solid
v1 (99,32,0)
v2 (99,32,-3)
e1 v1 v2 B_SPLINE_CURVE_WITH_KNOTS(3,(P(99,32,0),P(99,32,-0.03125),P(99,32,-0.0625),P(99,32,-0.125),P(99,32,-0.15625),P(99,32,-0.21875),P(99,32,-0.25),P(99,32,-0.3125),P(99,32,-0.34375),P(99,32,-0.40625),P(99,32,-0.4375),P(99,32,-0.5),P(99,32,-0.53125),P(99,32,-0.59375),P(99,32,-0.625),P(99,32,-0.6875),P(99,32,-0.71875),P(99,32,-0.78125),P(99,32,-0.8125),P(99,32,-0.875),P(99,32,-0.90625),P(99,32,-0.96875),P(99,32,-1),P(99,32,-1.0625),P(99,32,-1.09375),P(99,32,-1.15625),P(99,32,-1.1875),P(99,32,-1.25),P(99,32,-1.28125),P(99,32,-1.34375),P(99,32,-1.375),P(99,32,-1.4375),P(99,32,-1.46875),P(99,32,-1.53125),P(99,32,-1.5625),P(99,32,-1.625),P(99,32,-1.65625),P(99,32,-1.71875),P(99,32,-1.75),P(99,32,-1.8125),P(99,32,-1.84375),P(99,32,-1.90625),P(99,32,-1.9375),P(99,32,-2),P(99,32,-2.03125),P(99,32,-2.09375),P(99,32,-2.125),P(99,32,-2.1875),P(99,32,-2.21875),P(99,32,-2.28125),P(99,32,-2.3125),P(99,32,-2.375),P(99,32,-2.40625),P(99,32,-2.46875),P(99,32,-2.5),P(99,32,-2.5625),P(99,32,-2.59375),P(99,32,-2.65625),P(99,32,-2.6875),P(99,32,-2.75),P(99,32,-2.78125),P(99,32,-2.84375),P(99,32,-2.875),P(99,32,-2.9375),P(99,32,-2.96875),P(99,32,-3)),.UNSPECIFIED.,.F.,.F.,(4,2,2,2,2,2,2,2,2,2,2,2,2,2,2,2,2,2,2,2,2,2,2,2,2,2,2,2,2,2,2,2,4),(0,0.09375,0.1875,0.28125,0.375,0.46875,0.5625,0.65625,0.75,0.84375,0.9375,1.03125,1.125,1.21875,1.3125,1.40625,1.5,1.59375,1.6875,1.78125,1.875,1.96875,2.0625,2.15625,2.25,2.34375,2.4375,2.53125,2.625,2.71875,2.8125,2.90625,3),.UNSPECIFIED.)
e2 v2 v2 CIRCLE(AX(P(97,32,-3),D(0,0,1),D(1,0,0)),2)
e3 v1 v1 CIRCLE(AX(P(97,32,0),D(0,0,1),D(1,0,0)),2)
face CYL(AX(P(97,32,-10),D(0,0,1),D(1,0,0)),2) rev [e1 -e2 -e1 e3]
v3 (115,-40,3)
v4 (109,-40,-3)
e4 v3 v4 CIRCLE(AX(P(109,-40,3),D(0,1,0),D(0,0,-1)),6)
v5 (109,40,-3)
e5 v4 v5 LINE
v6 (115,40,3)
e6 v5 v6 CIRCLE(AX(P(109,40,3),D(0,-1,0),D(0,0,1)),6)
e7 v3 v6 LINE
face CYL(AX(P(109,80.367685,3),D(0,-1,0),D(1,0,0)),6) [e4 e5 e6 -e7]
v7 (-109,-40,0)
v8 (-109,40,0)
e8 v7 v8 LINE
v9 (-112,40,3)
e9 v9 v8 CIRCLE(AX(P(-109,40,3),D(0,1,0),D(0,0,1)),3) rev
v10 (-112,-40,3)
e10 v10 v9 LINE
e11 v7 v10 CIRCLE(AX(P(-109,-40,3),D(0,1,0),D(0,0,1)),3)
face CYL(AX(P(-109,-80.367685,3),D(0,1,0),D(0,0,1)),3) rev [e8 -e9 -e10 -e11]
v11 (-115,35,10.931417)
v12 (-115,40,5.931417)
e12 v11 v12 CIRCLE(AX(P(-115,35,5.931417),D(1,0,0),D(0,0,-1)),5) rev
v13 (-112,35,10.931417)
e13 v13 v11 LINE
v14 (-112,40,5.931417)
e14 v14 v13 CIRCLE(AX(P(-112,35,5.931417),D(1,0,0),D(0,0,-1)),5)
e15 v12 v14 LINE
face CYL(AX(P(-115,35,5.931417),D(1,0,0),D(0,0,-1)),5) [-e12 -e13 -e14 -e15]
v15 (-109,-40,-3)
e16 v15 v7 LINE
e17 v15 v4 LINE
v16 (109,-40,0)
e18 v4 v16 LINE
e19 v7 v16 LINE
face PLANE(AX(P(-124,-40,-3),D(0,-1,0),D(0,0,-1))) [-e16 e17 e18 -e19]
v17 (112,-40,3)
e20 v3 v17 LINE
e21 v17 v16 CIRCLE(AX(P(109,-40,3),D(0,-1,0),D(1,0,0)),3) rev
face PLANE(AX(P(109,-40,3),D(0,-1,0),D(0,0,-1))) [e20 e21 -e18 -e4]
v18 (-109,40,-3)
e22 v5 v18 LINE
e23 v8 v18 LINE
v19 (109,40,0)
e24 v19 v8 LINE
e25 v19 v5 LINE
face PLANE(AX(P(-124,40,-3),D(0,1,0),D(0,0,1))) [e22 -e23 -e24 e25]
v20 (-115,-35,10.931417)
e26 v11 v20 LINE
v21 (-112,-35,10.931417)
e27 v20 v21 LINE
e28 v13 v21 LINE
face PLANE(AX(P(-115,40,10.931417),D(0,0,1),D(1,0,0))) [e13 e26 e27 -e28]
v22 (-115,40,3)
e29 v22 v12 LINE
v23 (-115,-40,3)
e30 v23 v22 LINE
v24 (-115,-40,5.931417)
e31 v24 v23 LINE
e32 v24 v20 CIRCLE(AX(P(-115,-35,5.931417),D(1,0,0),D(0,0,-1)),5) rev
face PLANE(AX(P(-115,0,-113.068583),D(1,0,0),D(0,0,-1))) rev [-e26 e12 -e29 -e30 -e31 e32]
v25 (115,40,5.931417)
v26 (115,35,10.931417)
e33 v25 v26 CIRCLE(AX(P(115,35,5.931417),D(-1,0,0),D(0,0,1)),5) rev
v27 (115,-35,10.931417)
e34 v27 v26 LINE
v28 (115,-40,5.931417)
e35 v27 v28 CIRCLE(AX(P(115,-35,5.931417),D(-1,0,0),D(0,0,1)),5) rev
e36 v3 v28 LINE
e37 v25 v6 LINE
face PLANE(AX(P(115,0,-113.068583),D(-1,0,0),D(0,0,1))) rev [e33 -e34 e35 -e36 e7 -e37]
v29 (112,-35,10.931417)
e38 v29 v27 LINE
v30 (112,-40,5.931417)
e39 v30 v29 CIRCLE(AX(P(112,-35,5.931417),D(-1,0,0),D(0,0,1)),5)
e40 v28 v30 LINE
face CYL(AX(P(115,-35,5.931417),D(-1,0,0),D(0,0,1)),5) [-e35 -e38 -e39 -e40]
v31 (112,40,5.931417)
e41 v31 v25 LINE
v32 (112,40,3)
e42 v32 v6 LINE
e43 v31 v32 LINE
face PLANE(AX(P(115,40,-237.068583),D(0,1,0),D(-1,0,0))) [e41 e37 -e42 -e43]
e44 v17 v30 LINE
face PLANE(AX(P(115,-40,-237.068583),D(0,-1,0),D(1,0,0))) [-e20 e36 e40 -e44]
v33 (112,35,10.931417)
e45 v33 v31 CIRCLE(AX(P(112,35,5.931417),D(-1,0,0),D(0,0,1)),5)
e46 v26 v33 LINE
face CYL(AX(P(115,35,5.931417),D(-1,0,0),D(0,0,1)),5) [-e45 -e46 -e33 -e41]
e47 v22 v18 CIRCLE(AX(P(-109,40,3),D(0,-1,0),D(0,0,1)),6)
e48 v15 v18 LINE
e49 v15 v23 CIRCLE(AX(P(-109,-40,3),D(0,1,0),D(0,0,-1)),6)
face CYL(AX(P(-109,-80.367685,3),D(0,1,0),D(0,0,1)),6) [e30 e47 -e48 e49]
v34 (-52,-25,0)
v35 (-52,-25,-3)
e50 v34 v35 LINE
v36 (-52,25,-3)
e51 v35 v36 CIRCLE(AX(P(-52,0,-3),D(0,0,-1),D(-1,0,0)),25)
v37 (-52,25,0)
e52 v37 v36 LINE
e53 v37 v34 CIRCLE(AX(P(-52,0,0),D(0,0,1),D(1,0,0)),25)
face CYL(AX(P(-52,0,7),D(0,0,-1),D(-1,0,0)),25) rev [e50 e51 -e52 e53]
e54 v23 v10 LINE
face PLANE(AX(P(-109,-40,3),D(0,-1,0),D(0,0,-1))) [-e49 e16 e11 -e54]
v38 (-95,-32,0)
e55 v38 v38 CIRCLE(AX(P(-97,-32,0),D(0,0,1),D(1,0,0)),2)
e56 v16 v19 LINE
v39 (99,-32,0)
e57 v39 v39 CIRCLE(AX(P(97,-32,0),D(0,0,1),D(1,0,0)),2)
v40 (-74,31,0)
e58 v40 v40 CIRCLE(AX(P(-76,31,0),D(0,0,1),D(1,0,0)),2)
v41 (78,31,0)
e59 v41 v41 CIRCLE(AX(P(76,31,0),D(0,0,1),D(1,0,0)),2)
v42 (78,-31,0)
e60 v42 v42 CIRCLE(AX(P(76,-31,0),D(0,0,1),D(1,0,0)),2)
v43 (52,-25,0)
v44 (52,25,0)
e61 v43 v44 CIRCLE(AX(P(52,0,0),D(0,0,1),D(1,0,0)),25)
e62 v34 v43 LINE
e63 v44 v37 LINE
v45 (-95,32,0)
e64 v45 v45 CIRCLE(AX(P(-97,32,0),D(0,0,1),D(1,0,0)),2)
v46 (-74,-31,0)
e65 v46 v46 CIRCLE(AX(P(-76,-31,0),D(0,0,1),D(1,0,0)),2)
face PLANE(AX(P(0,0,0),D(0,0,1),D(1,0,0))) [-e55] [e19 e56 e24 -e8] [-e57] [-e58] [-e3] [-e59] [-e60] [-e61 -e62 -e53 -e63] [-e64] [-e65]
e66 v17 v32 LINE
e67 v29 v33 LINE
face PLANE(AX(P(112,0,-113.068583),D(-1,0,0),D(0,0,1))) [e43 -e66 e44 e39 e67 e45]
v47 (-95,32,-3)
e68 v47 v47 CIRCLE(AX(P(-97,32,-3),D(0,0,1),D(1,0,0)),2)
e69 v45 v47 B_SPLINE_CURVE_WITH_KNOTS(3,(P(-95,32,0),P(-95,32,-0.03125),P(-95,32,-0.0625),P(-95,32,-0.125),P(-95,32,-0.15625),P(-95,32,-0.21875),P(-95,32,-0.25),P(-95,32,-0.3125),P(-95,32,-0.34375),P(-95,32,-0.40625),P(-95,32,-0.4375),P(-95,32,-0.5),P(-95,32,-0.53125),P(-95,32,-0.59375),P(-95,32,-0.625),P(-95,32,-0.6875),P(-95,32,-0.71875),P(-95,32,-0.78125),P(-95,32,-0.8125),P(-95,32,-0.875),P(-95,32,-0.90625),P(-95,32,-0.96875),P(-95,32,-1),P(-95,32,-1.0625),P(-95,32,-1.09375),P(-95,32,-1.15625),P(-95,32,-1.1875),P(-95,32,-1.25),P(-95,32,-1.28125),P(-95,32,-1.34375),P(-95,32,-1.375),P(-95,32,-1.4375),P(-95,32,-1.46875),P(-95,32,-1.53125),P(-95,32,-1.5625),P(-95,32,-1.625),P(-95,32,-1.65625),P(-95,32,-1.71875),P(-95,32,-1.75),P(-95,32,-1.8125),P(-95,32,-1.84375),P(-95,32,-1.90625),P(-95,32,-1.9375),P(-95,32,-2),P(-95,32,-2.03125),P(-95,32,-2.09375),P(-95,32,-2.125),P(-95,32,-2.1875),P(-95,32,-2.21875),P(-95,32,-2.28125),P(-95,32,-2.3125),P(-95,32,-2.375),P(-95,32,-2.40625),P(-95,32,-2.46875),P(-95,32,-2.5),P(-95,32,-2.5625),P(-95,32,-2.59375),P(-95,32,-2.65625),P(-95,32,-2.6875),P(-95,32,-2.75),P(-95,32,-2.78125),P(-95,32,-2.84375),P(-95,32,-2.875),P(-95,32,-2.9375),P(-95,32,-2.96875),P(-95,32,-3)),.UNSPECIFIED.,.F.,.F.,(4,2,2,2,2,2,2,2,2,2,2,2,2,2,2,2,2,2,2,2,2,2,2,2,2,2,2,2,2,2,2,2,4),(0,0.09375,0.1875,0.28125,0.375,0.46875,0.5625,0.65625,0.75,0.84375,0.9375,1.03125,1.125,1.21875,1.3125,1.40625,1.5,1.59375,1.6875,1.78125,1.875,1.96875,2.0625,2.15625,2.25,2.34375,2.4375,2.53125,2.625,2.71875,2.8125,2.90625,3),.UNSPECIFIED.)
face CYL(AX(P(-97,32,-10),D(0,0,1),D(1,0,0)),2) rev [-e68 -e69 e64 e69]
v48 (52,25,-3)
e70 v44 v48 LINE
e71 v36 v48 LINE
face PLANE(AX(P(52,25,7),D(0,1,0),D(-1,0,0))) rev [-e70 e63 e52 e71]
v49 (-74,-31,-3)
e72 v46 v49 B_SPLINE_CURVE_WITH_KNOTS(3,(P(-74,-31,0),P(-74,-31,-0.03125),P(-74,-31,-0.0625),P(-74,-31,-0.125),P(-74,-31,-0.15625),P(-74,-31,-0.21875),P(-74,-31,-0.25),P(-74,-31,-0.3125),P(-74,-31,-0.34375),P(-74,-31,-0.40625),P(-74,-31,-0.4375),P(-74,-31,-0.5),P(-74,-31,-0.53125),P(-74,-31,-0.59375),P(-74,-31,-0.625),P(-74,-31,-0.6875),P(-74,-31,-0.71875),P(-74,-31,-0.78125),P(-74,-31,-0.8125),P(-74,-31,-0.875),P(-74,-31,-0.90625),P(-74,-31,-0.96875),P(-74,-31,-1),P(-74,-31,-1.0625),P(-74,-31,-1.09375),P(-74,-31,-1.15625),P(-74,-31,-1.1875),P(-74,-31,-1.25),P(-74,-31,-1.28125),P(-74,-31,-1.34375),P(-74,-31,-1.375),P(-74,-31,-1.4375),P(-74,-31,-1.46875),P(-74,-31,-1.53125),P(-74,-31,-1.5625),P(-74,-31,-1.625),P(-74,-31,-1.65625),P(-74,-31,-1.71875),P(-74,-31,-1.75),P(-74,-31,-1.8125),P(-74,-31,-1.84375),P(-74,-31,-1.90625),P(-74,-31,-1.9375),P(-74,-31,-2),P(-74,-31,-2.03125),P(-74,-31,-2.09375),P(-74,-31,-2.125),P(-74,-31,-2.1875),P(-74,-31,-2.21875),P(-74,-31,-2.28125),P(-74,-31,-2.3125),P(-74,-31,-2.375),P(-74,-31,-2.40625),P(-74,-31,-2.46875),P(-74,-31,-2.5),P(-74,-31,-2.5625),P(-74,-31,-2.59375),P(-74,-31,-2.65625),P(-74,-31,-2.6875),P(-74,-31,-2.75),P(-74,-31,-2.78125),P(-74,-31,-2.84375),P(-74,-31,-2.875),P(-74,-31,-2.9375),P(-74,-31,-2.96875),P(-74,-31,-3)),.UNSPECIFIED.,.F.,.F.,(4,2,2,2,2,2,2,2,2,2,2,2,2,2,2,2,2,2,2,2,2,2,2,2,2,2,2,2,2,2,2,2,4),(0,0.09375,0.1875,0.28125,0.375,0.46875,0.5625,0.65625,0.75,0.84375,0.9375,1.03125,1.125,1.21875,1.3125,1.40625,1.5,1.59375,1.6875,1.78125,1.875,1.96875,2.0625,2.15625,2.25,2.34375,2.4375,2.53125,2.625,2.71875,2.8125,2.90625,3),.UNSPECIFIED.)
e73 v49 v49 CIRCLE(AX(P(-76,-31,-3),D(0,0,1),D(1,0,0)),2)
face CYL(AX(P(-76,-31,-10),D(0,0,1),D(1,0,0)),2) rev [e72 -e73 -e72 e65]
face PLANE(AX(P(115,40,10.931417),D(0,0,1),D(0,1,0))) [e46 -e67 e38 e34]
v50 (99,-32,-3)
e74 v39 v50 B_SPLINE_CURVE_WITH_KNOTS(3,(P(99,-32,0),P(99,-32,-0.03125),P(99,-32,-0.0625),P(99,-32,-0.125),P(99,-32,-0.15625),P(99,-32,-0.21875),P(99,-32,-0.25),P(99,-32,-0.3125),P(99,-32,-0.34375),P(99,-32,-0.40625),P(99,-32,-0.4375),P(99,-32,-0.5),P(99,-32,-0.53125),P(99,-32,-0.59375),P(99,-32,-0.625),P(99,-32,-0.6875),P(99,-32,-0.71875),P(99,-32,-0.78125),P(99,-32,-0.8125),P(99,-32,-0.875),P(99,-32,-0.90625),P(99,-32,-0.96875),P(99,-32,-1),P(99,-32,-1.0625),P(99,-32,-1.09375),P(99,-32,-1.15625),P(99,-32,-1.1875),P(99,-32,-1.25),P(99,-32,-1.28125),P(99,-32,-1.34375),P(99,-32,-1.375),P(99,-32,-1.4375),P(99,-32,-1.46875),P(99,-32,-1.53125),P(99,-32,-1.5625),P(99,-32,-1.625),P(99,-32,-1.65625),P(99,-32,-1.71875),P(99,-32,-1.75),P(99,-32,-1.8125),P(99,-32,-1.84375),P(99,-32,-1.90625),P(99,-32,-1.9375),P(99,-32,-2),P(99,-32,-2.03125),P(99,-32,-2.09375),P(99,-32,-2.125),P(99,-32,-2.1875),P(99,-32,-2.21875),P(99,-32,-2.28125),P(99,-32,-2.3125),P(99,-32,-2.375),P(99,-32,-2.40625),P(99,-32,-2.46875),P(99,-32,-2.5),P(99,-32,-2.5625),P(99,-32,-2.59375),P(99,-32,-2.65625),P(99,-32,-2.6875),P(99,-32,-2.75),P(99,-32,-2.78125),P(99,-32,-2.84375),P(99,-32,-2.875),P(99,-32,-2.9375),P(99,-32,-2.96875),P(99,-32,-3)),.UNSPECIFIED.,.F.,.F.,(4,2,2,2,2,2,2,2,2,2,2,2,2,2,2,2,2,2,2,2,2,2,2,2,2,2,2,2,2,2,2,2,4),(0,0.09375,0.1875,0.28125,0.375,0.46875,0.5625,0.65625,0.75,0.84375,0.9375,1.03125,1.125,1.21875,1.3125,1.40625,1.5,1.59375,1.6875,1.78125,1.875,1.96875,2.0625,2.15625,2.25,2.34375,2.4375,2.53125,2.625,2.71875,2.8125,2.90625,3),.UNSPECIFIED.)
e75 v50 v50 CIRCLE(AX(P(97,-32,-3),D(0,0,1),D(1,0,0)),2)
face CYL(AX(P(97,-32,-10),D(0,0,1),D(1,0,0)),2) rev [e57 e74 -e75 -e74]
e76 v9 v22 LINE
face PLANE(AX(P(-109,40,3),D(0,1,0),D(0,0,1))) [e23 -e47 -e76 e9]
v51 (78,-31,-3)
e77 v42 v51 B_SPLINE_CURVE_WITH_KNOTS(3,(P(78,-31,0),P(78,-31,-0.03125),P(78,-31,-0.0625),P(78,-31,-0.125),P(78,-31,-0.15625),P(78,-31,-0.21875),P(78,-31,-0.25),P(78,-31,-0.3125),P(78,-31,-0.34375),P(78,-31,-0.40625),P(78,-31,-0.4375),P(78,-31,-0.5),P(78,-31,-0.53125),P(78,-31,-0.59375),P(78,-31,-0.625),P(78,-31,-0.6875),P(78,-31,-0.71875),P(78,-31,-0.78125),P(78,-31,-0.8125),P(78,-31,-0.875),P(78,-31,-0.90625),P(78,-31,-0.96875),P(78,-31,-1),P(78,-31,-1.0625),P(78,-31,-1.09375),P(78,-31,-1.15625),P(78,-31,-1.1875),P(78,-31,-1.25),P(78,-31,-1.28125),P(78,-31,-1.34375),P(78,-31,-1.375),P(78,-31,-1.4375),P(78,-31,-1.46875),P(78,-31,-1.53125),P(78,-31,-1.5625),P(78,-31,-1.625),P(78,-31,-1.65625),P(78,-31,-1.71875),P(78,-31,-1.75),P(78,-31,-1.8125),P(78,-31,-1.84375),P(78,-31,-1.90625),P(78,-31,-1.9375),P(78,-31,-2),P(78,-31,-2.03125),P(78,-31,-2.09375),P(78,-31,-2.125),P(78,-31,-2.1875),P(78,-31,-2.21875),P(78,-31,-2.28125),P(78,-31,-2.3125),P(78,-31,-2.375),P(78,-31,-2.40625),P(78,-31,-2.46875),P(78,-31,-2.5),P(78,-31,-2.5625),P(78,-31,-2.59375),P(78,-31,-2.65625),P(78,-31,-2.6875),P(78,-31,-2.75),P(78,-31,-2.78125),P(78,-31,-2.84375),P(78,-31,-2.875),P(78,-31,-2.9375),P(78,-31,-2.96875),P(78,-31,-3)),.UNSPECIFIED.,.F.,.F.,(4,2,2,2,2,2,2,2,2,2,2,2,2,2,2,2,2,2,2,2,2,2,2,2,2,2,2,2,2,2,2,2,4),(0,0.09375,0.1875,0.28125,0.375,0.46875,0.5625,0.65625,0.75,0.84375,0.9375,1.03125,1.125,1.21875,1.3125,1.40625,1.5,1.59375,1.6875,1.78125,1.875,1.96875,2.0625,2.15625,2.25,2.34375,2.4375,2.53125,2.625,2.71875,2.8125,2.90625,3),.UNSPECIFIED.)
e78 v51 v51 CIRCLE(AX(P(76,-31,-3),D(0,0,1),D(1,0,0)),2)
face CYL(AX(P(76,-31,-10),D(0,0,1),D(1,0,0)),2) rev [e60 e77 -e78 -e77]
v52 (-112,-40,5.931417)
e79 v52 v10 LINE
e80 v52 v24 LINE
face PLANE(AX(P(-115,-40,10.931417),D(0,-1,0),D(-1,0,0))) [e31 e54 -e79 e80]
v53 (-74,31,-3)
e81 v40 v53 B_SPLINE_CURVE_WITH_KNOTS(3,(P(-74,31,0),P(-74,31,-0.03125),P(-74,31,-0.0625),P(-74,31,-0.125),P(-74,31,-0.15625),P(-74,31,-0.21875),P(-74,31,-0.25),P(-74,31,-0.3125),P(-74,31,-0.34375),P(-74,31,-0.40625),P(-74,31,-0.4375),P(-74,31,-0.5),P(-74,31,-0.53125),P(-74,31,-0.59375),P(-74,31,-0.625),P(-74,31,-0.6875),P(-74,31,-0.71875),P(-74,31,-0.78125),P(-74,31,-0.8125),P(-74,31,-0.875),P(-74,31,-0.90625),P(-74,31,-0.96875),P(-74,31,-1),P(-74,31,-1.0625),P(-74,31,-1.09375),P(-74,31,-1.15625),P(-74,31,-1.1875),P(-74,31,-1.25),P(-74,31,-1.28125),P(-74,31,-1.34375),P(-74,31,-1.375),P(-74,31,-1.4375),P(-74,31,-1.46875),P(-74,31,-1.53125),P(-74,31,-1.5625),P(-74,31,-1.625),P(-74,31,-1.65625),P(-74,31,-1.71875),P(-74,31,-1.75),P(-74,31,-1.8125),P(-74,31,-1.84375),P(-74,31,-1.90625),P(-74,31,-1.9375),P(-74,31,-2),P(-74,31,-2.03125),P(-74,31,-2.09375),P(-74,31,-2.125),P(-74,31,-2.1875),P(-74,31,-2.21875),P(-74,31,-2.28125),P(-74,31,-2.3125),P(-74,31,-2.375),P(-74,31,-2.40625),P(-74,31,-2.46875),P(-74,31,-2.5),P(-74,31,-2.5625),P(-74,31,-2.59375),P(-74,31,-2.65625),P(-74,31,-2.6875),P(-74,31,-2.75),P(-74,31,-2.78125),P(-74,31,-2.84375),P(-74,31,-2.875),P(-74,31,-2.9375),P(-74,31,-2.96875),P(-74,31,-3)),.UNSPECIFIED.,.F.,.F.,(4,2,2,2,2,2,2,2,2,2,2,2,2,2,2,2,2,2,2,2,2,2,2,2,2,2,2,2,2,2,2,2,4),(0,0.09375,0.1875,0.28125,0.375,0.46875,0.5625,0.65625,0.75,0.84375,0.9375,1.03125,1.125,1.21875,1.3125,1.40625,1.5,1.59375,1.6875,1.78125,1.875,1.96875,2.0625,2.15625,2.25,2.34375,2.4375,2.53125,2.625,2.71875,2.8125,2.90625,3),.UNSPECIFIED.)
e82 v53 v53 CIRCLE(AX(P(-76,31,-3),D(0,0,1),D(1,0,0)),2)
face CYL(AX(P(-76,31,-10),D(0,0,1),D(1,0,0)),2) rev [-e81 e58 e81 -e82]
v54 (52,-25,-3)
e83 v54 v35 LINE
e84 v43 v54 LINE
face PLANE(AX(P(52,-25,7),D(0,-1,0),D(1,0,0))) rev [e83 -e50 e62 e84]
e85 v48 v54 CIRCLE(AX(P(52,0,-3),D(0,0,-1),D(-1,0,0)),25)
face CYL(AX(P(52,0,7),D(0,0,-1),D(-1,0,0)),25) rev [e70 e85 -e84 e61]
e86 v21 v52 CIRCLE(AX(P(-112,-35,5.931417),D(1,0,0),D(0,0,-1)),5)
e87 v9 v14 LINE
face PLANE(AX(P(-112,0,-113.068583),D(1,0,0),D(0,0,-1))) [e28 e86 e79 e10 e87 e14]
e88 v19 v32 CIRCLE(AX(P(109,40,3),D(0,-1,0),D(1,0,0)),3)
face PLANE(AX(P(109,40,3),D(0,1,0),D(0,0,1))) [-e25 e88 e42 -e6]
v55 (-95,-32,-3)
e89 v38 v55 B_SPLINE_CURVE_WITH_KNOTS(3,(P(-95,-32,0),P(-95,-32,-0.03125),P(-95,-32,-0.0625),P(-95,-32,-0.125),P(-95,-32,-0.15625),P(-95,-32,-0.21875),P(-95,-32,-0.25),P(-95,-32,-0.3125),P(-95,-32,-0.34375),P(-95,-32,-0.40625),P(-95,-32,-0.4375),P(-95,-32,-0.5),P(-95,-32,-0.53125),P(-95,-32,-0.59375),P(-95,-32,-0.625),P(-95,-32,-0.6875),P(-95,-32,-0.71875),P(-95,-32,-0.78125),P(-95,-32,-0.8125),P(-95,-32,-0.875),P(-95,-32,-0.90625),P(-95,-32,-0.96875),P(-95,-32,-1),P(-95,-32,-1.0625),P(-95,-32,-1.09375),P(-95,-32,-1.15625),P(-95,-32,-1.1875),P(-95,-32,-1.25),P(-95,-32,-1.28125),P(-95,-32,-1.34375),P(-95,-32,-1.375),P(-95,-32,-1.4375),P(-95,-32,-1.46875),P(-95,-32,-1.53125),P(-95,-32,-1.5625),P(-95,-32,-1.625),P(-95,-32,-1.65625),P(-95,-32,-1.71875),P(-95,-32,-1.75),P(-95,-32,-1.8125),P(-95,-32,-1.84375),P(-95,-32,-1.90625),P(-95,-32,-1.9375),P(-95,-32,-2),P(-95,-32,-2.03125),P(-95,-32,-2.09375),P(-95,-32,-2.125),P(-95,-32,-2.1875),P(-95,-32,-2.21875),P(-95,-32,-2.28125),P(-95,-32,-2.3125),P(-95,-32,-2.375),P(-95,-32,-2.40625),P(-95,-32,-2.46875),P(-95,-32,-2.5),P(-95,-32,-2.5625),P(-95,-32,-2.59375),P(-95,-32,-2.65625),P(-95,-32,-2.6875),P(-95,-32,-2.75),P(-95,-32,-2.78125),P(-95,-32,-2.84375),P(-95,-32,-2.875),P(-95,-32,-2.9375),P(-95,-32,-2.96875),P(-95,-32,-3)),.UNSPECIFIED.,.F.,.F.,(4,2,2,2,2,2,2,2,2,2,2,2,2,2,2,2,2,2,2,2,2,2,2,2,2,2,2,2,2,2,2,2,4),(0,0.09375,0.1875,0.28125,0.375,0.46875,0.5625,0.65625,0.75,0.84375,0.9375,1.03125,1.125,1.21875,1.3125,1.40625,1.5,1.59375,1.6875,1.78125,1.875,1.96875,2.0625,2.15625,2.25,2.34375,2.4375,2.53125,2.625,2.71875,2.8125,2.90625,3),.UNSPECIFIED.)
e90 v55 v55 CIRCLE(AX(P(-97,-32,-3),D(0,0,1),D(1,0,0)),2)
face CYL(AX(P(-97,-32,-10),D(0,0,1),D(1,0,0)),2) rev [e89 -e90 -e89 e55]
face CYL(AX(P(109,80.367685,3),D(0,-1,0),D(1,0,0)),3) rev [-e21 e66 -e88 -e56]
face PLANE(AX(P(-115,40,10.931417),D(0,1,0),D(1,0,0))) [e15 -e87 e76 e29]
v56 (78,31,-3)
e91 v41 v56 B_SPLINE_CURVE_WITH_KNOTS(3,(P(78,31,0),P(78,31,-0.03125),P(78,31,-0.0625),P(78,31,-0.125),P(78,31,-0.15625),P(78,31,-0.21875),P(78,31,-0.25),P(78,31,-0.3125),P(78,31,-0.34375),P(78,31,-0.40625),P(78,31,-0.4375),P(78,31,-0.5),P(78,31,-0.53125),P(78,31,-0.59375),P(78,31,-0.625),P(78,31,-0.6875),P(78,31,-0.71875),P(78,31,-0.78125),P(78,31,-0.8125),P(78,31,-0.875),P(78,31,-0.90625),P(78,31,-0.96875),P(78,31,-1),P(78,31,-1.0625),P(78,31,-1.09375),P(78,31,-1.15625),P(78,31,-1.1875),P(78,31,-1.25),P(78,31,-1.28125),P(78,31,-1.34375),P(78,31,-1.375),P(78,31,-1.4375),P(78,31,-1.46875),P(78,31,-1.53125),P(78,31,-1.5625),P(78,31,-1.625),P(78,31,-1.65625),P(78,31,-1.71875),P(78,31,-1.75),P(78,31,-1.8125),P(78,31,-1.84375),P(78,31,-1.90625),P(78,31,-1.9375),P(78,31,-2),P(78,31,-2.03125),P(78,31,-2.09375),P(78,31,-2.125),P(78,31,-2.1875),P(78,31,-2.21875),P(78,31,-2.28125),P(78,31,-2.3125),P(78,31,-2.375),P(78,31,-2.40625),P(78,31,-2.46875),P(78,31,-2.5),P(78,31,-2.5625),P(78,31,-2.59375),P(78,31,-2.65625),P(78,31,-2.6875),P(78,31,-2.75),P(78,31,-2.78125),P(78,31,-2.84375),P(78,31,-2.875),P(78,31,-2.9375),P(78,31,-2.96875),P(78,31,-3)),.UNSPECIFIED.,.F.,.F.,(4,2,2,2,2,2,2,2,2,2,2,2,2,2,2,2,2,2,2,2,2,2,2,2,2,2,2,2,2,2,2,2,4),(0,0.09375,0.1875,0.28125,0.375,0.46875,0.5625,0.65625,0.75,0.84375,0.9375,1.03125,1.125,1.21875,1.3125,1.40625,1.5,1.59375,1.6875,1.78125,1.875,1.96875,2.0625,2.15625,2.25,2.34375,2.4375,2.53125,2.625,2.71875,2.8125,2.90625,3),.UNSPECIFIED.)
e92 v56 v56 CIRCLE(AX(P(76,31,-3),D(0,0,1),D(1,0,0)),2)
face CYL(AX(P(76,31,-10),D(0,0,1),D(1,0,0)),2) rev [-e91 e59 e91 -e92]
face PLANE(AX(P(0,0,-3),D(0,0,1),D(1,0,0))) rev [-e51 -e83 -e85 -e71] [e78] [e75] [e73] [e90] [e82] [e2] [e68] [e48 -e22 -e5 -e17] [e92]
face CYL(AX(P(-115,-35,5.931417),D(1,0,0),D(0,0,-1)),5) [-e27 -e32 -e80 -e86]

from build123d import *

# Parameters (mm, degrees)
SKETCH_1_W             = 248
SKETCH_1_H             = 80
SM_BASE_FLANGE_1_DEPTH = 3
SKETCH_6_R             = 2
CUT_EXTRUDE_1_DEPTH    = 10
OTHER_START            = -40
OTHER_1_DEPTH          = 80
OTHER_1_2_DEPTH        = 80
CUT_EXTRUDE_2_DEPTH    = 10
FILLET_1_R             = 5


# Read off the part's stored shape, not the designer's step: 绘制的折弯1
# Sheet-metal steps are written as plain solids
with BuildPart() as part:
    # Sketch 1 → 基体-法兰1 (new body)
    with BuildSketch(Plane.XY):
        Rectangle(SKETCH_1_W, SKETCH_1_H)
    extrude(amount=-SM_BASE_FLANGE_1_DEPTH)

    # 草图6 → 切除-拉伸1 (cut)
    with BuildSketch(Plane.XY):
        with Locations((-97, 32)):
            Circle(SKETCH_6_R)
        with Locations((-76, 31)):
            Circle(SKETCH_6_R)
        with Locations((97, 32)):
            Circle(SKETCH_6_R)
        with Locations((76, 31)):
            Circle(SKETCH_6_R)
        with Locations((76, -31)):
            Circle(SKETCH_6_R)
        with Locations((97, -32)):
            Circle(SKETCH_6_R)
        with Locations((-97, -32)):
            Circle(SKETCH_6_R)
        with Locations((-76, -31)):
            Circle(SKETCH_6_R)
    extrude(amount=-CUT_EXTRUDE_1_DEPTH, mode=Mode.SUBTRACT)

    # Other 1 outline → Other 1 (cut)
    with BuildSketch(Plane(origin=(0, 0, 0), x_dir=(1, 0, 0), z_dir=(0, 1, 0)).offset(OTHER_START)):
        with BuildLine():
            Line((124, 3), (109, 3))
            ThreePointArc((109, 3), (112, 2.196152423), (114.196152423, 0))
            Line((114.196152423, 0), (124, 0))
            Line((124, 0), (124, 3))
        make_face()
        with BuildLine():
            ThreePointArc((-114.196152423, 0), (-112, 2.196152423), (-109, 3))
            Line((-109, 3), (-124, 3))
            Line((-124, 3), (-124, 0))
            Line((-124, 0), (-114.196152423, 0))
        make_face()
    extrude(amount=OTHER_1_DEPTH, mode=Mode.SUBTRACT)

    # Other 1 2 outline → Other 1 2 (add)
    with BuildSketch(Plane(origin=(0, 0, 0), x_dir=(1, 0, 0), z_dir=(0, 1, 0)).offset(OTHER_START)):
        with BuildLine():
            ThreePointArc((115, -3), (114.795554958, -1.447085729), (114.196152423, 0))
            Line((114.196152423, 0), (109, 0))
            ThreePointArc((109, 0), (111.121320344, -0.878679656), (112, -3))
            Line((112, -3), (112, -10.931416529))
            Line((112, -10.931416529), (115, -10.931416529))
            Line((115, -10.931416529), (115, -3))
        make_face()
        with BuildLine():
            Line((-109, 0), (-114.196152423, 0))
            ThreePointArc((-114.196152423, 0), (-114.795554958, -1.447085729), (-115, -3))
            Line((-115, -3), (-115, -10.931416529))
            Line((-115, -10.931416529), (-112, -10.931416529))
            Line((-112, -10.931416529), (-112, -3))
            ThreePointArc((-112, -3), (-111.121320344, -0.878679656), (-109, 0))
        make_face()
    extrude(amount=OTHER_1_2_DEPTH)

    # 草图8 → 切除-拉伸2 (cut)
    with BuildSketch(Plane(origin=(0, 0, -3), x_dir=(-1, 0, 0), z_dir=(0, 0, -1))):
        with BuildLine():
            Line((-52, 25), (52, 25))
            ThreePointArc((52, 25), (77, 0), (52, -25))
            Line((52, -25), (-52, -25))
            ThreePointArc((-52, -25), (-77, 0), (-52, 25))
        make_face()
    extrude(amount=-CUT_EXTRUDE_2_DEPTH, mode=Mode.SUBTRACT)

    # 圆角1
    fillet_1_edges = [part.edges().sort_by_distance(p)[0] for p in [
        (113.5, 40, 10.931416529),
        (113.5, -40, 10.931416529),
        (-113.5, -40, 10.931416529),
        (-113.5, 40, 10.931416529),
    ]]
    fillet(fillet_1_edges, radius=FILLET_1_R)


solid = part.part
